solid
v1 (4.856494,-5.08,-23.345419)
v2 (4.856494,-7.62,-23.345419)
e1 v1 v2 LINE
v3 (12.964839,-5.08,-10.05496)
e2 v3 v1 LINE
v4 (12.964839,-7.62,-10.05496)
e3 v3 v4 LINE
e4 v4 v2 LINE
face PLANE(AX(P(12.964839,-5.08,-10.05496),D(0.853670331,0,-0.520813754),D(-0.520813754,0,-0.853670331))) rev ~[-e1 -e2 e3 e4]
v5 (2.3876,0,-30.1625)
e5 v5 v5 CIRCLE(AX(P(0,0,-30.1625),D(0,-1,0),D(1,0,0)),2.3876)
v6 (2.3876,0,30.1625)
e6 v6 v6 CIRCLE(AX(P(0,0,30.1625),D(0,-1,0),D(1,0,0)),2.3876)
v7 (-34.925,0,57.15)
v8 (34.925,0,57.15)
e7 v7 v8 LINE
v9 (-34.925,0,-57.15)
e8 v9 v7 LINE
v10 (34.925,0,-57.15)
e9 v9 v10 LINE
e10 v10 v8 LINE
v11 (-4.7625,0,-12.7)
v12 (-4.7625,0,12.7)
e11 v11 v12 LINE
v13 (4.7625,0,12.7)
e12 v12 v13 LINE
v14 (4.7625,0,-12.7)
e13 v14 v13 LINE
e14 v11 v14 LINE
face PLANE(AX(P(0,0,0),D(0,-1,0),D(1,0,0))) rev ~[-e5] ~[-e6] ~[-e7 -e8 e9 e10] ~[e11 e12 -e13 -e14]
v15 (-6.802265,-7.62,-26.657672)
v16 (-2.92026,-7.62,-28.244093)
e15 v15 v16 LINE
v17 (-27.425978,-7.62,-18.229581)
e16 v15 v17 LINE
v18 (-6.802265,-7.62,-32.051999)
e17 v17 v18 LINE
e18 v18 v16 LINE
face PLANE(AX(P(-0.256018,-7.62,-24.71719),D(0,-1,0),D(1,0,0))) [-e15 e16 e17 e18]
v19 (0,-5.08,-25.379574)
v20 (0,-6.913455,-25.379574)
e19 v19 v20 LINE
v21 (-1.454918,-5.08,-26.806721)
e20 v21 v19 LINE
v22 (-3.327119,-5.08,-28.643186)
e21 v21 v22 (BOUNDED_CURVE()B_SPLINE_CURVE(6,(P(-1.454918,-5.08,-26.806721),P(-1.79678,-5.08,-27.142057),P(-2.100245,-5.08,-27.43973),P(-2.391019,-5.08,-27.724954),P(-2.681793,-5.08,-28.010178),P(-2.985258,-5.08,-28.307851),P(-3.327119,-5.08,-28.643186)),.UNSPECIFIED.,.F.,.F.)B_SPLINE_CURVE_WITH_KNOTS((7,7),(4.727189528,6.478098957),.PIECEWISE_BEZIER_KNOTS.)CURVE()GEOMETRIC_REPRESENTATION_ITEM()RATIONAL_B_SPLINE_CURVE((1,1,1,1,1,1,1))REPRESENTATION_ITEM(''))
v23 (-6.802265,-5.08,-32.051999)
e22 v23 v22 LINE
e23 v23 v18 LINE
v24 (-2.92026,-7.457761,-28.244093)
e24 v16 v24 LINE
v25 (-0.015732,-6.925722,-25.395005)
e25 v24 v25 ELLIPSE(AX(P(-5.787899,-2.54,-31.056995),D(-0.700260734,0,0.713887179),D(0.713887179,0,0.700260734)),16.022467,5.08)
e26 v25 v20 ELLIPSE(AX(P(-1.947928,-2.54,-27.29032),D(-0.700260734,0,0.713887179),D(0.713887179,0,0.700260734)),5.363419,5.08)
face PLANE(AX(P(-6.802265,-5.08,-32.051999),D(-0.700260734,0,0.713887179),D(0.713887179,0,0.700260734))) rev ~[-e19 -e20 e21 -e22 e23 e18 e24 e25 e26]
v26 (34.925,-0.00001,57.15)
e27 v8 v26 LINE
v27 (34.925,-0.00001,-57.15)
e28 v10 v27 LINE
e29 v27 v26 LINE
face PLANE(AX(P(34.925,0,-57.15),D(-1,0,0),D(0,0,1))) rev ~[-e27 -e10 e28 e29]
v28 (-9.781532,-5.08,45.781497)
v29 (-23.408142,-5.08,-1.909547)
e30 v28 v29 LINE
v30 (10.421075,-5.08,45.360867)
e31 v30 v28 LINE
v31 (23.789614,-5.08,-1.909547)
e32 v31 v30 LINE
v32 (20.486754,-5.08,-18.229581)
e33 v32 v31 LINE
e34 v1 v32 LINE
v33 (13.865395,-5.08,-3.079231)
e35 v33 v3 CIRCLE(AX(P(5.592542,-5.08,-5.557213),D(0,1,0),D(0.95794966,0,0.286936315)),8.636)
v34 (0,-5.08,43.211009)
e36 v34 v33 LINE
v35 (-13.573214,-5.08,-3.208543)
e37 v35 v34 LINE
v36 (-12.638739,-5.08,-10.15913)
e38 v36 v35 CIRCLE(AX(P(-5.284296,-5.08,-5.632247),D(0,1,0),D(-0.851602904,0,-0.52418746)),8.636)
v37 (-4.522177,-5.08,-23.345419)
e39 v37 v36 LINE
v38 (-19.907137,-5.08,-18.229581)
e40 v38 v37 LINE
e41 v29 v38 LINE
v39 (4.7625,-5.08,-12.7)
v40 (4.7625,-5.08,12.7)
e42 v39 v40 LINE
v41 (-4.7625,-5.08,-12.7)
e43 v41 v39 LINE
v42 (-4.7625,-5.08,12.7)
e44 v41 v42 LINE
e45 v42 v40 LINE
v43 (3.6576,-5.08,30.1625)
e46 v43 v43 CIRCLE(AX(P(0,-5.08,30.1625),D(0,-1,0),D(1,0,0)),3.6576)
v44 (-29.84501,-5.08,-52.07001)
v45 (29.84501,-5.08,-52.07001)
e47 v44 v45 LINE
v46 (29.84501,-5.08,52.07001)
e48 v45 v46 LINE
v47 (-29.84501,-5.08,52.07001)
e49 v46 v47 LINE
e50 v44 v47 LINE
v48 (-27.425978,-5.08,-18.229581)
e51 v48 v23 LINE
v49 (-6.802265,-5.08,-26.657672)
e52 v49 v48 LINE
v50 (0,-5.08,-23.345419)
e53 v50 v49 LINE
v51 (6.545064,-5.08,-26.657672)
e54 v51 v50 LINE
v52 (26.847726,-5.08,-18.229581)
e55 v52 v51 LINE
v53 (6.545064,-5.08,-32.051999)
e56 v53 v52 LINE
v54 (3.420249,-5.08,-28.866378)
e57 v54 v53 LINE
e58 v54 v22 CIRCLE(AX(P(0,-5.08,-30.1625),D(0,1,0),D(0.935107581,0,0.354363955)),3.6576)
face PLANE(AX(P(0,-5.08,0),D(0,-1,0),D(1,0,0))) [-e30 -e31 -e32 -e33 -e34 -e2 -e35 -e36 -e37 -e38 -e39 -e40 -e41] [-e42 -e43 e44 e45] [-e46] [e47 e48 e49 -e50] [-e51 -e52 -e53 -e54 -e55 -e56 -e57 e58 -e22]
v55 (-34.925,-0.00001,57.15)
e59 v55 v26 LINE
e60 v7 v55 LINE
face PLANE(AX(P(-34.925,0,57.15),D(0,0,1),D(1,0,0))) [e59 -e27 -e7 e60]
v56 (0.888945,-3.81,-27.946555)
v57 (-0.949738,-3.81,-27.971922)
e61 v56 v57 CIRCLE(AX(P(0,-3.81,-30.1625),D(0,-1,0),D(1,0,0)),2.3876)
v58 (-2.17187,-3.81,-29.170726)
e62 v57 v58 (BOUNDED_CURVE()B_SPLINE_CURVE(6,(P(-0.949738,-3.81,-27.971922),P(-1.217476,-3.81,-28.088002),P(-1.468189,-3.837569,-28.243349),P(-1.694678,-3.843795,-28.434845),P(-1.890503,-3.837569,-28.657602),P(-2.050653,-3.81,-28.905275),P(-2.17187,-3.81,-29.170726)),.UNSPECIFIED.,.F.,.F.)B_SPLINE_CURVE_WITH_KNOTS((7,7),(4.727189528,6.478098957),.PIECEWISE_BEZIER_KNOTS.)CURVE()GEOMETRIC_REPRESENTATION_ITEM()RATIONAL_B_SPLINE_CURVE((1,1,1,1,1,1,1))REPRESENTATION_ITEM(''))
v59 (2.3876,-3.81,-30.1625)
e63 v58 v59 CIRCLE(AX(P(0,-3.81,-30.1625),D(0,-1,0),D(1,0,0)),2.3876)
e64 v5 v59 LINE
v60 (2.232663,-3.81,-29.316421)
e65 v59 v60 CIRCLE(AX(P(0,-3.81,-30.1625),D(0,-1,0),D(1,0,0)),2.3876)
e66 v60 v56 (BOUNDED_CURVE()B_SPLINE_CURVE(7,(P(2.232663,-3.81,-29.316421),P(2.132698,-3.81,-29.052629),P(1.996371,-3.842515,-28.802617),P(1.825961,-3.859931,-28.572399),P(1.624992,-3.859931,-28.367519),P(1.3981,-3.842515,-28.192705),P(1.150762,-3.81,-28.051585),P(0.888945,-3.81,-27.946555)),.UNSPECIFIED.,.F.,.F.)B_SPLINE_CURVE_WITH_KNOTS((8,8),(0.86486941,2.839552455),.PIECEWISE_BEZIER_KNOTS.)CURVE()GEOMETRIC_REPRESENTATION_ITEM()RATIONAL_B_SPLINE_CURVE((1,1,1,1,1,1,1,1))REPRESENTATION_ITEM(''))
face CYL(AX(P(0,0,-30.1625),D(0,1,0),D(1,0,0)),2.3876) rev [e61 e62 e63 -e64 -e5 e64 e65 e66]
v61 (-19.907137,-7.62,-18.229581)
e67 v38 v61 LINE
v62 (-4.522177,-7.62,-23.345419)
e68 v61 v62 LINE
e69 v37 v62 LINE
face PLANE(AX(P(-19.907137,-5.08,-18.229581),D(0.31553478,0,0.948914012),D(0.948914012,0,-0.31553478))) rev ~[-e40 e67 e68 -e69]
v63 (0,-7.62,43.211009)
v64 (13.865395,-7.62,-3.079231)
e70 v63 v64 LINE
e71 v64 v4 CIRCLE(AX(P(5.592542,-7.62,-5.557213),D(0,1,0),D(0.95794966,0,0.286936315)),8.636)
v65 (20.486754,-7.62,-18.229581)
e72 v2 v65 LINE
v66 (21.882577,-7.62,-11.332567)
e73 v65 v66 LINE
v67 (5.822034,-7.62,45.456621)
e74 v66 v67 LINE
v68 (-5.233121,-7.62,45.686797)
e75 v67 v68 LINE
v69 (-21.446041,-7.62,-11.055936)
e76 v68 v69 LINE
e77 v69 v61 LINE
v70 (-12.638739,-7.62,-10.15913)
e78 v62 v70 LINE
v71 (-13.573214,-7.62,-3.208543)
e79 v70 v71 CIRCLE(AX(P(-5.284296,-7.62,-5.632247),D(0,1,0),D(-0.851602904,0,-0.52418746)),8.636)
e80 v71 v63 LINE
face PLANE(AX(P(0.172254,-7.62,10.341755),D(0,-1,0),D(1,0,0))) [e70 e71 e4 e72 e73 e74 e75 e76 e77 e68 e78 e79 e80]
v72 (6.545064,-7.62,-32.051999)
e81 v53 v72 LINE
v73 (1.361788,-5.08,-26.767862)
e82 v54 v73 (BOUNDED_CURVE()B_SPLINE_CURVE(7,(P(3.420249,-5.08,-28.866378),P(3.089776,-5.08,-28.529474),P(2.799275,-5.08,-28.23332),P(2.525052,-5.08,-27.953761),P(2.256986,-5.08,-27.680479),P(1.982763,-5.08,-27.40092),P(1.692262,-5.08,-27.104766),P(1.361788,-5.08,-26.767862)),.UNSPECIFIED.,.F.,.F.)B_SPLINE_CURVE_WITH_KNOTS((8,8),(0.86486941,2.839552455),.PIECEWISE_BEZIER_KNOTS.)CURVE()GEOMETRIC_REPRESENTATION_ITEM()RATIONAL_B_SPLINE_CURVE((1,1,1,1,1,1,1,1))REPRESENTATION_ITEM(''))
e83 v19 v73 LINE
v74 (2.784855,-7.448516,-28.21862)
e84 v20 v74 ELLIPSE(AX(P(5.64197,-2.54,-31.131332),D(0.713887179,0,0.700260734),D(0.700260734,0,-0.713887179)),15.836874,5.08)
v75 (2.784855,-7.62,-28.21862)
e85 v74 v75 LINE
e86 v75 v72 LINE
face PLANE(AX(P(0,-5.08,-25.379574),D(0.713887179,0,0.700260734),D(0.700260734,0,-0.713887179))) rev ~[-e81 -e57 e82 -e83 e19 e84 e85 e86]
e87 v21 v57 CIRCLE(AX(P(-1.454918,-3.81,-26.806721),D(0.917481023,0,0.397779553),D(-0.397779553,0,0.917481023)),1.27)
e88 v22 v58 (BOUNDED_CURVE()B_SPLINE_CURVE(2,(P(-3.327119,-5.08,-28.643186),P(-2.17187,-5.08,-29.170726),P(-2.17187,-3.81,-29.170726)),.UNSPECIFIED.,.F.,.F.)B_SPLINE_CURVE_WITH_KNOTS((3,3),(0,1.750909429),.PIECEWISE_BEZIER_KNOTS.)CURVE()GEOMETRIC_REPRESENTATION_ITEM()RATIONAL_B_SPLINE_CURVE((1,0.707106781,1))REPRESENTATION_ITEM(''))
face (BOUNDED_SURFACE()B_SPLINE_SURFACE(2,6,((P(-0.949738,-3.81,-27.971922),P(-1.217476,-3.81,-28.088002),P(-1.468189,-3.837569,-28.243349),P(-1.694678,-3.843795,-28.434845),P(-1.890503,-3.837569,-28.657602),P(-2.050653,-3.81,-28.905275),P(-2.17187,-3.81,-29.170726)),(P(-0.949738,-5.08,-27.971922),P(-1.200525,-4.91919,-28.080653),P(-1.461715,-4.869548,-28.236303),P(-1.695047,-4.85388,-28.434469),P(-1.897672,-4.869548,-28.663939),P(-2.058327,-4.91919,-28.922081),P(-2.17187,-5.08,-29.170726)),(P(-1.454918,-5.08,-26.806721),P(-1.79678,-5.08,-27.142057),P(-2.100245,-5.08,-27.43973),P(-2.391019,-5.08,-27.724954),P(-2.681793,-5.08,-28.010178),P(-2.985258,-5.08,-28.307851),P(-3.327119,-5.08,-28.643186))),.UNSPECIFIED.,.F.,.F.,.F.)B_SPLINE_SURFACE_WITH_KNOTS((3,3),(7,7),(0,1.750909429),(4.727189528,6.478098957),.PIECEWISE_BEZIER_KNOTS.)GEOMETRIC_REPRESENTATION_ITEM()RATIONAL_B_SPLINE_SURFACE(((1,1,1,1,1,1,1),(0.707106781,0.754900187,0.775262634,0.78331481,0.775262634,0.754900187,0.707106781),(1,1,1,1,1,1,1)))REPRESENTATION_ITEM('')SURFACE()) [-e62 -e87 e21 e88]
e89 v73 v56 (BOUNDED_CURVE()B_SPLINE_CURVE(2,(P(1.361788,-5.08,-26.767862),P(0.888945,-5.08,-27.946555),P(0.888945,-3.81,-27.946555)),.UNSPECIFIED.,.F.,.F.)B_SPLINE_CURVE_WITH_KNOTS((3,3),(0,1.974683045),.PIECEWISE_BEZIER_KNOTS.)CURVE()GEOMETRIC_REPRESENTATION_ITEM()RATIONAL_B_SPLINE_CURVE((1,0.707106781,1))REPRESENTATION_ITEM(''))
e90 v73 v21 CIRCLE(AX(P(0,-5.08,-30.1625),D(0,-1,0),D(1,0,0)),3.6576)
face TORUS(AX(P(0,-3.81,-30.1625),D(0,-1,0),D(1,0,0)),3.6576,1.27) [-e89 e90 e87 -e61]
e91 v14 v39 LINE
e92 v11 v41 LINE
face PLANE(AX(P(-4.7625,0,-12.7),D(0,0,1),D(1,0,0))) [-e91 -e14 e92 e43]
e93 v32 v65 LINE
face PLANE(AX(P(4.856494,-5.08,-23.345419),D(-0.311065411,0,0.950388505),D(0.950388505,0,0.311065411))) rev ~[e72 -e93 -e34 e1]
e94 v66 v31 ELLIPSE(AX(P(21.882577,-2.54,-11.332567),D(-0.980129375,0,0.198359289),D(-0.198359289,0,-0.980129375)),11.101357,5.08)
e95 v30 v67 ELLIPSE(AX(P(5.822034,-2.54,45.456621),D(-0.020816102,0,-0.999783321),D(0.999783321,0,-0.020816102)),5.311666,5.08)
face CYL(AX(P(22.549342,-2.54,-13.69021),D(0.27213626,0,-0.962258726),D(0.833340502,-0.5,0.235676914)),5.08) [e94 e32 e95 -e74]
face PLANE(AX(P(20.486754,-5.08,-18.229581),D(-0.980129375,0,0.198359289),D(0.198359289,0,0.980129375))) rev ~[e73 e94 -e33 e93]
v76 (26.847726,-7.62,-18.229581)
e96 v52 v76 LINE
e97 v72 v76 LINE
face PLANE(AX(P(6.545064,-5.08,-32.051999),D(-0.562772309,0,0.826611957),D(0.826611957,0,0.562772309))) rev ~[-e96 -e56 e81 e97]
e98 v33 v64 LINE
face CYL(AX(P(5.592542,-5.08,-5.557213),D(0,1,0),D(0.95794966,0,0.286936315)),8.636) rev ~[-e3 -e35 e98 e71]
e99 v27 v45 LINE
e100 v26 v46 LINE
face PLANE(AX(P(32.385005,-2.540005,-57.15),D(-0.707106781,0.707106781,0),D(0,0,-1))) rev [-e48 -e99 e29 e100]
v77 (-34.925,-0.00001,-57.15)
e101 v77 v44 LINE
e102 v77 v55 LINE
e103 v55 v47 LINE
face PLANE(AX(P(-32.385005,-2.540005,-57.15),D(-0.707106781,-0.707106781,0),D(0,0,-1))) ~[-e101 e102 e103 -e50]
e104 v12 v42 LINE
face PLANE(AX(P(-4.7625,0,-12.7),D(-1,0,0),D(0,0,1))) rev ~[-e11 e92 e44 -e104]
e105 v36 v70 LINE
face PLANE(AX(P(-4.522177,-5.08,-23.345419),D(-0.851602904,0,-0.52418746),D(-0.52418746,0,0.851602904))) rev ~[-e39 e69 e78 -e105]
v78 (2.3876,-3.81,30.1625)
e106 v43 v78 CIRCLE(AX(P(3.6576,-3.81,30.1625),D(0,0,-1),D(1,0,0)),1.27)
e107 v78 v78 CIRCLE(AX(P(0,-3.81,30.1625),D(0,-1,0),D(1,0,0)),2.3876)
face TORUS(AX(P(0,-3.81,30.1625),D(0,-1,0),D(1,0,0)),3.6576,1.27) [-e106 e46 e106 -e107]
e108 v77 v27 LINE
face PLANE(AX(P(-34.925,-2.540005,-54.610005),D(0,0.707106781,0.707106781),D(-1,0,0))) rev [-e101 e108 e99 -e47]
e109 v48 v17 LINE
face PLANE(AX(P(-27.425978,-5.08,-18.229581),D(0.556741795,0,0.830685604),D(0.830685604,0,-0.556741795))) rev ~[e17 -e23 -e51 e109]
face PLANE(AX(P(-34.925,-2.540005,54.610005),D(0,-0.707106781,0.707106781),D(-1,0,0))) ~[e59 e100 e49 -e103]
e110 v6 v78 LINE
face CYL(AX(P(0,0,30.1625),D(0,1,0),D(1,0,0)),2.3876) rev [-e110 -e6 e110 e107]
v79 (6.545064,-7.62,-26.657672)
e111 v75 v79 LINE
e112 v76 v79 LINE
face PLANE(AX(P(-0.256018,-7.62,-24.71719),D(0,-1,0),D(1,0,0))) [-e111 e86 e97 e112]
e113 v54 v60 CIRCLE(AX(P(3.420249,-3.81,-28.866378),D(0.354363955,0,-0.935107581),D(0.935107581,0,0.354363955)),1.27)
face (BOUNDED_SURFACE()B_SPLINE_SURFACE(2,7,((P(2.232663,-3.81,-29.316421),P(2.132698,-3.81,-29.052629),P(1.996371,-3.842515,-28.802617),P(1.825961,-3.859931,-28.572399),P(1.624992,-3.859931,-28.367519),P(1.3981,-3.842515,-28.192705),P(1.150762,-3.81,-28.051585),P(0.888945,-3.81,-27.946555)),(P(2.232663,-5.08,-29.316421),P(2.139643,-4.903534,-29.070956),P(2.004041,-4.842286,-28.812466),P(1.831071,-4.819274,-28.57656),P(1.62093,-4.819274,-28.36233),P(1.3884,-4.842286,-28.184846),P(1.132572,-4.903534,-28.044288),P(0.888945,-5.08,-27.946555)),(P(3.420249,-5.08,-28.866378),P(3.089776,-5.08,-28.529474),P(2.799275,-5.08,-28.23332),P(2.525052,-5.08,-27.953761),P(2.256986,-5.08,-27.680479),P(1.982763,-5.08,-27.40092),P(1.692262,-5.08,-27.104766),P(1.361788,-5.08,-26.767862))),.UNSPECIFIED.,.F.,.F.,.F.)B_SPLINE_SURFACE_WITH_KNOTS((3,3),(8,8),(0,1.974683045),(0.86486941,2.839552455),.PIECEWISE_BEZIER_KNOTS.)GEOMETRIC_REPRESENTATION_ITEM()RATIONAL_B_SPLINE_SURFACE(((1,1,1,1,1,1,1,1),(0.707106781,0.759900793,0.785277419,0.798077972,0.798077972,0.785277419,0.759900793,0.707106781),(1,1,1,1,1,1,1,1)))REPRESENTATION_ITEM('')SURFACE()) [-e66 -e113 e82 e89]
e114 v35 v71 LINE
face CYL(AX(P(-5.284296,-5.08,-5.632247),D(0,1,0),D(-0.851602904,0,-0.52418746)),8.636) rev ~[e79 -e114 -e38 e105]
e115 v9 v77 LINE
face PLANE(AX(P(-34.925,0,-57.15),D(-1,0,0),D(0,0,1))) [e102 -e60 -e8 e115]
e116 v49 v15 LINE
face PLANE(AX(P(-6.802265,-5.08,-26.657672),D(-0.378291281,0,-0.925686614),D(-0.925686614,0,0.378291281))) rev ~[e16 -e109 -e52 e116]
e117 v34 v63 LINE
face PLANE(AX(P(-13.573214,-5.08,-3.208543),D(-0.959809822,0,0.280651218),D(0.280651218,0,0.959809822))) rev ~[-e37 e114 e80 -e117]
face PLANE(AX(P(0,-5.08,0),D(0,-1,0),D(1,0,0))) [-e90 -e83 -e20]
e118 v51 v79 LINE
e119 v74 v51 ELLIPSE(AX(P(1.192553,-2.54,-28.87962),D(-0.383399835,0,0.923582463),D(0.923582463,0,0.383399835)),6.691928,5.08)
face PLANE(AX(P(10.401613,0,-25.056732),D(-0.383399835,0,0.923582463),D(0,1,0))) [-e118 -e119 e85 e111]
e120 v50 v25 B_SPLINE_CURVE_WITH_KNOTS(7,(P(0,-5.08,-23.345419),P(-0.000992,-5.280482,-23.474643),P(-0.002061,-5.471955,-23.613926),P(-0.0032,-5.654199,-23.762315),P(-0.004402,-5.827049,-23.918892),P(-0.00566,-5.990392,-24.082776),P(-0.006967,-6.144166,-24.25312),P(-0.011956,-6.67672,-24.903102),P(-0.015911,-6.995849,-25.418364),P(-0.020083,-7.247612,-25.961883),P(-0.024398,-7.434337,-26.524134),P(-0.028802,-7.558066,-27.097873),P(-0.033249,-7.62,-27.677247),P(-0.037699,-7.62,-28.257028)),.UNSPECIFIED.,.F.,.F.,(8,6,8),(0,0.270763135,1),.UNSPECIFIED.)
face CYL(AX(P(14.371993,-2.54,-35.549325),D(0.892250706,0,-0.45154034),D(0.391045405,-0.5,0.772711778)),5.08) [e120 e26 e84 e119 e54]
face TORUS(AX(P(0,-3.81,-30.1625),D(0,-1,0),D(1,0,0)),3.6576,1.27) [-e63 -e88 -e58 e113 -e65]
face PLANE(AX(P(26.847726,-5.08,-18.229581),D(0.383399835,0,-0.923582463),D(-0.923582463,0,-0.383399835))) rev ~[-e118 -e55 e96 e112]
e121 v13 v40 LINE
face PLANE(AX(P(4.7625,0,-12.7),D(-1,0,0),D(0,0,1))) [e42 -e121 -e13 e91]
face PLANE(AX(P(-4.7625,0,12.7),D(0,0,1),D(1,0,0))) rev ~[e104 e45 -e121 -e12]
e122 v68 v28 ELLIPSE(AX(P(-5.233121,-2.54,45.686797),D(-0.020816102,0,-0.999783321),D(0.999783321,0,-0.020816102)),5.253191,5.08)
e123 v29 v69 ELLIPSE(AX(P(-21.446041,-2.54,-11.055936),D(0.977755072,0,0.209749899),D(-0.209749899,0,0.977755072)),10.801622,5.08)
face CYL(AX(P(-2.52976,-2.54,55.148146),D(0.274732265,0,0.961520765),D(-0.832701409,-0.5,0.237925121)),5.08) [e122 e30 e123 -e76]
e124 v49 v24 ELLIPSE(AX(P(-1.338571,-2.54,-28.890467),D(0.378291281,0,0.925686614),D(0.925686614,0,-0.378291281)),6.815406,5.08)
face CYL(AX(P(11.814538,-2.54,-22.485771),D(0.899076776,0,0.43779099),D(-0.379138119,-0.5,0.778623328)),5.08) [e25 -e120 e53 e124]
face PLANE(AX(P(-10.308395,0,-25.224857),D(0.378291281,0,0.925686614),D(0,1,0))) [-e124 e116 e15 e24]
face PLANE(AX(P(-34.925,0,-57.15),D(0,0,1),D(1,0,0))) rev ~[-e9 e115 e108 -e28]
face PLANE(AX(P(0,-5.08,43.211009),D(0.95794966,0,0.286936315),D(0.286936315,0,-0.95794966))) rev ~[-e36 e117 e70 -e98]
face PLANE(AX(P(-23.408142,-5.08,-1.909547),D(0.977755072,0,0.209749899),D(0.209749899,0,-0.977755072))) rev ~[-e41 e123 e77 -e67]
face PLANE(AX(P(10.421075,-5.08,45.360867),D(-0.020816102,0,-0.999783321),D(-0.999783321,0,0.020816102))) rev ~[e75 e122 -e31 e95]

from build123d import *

# Parameters (mm, degrees)
F0_W         = 69.85
F0_H         = 114.3
F0_R         = 2.3876
F0_W_2       = 9.525
F0_H_2       = 25.4
F1_DEPTH     = 5.08
F2_SIZE      = 5.07999
F4_DEPTH     = 2.54
F5_T1_DEPTH  = 71.5966436916
F5_T3_DEPTH  = 71.1214770669
F5_T8_DEPTH  = 29.3324993846
F5_T14_DEPTH = 29.5628780991
F6_R         = 1.27


# Not quite as in the source:
# - a fillet or chamfer that OpenCascade refuses, or shapes differently, is made with other operations: its cross-section is extruded or revolved along the edge and cut away or added
# - a fillet or chamfer is up to 0.001 mm smaller than in the source, because OpenCascade refuses the exact size


with BuildPart() as f1:
    # F0 (on Front) → F1 (new body)
    with BuildSketch(Plane.XZ):
        Rectangle(F0_W, F0_H)
        with Locations((0, -30.1625)):
            Circle(F0_R, mode=Mode.SUBTRACT)
        Rectangle(F0_W_2, F0_H_2, mode=Mode.SUBTRACT)
        with Locations((0, 30.1625)):
            Circle(F0_R, mode=Mode.SUBTRACT)
    extrude(amount=F1_DEPTH)

    # F2 (size 5.08 in the source; OpenCascade refuses exactly that, so slightly less here)
    f2_edges = [f1.edges().sort_by_distance(p)[0] for p in [
        (0, -5.08, 57.15),
        (34.925, -5.08, 0),
        (0, -5.08, -57.15),
        (-34.925, -5.08, 0),
    ]]
    chamfer(f2_edges, length=F2_SIZE)

    # F3 (on face) → F4 (join)
    with BuildSketch(Plane.XZ.offset(5.08)):
        with BuildLine():
            Line((10.4210752899, 45.360866621), (-9.7815324138, 45.7814973))
            Line((-9.7815324138, 45.7814973), (-23.4081424498, -1.9095465541))
            Line((-23.4081424498, -1.9095465541), (-19.9071371743, -18.2295814157))
            Line((-19.9071371743, -18.2295814157), (-4.5221770743, -23.345419034))
            Line((-4.5221770743, -23.345419034), (-12.6387388145, -10.1591296217))
            ThreePointArc((-12.6387388145, -10.1591296217), (-13.8432881685, -6.7829644544), (-13.5732137506, -3.2085427961))
            Line((-13.5732137506, -3.2085427961), (0, 43.2110093534))
            Line((0, 43.2110093534), (13.8653954743, -3.0792306258))
            ThreePointArc((13.8653954743, -3.0792306258), (14.1574638309, -6.6629312481), (12.9648391888, -10.0549602188))
            Line((12.9648391888, -10.0549602188), (4.856493974, -23.345419034))
            Line((4.856493974, -23.345419034), (20.4867540311, -18.2295814157))
            Line((20.4867540311, -18.2295814157), (23.789614439, -1.9095465541))
            Line((23.789614439, -1.9095465541), (10.4210752899, 45.360866621))
        make_face()
        Polygon((6.5450641223, -26.6576724823), (0, -23.345419034), (-6.802264601, -26.6576724823), (-27.4259783328, -18.2295814157), (-6.802264601, -32.0519991219), (0, -25.3795739263), (6.5450641223, -32.0519991219), (26.8477257341, -18.2295814157), align=None)
    extrude(amount=F4_DEPTH)

    # F5: fillet of radius 5.08 on 4 edges, made by hand

    # F5_s2 → F5_t1 (cut)
    with BuildSketch(Plane(origin=(14.3770362631, 0, 50.317420481), x_dir=(0, 1, 0), z_dir=(-0.2747322653, 0, -0.9615207655))):
        with BuildLine():
            ThreePointArc((-5.08, -21.9828009958), (-6.9394090512, -20.1233919446), (-7.62, -17.5833919446))
            Line((-7.62, -17.5833919446), (-7.62, -21.9828009958))
            Line((-7.62, -21.9828009958), (-5.08, -21.9828009958))
        make_face()
    extrude(amount=F5_T1_DEPTH, mode=Mode.SUBTRACT)

    # F5_s4 → F5_t3 (cut)
    with BuildSketch(Plane(origin=(5.2549558521, 0, -18.5812325171), x_dir=(0, 1, 0), z_dir=(-0.27213626, 0, 0.9622587261))):
        with BuildLine():
            ThreePointArc((-5.08, -22.3721072272), (-6.9394090512, -20.5126981759), (-7.62, -17.9726981759))
            Line((-7.62, -17.9726981759), (-7.62, -22.3721072272))
            Line((-7.62, -22.3721072272), (-5.08, -22.3721072272))
        make_face()
    extrude(amount=F5_T3_DEPTH, mode=Mode.SUBTRACT)


with BuildPart() as f5_tool6:
    # F5_s7 → F5_t8 (new body)
    with BuildSketch(Plane(origin=(25.7640738936, 0, -13.0383967217), x_dir=(0, 1, 0), z_dir=(-0.8922507056, 0, 0.4515403396))):
        with BuildLine():
            ThreePointArc((-5.08, 20.8299666066), (-6.9394090512, 22.6893756578), (-7.62, 25.2293756578))
            Line((-7.62, 25.2293756578), (-7.62, 20.8299666066))
            Line((-7.62, 20.8299666066), (-5.08, 20.8299666066))
        make_face()
    extrude(amount=F5_T8_DEPTH)

    split(bisect_by=Plane(origin=(10.401612722, 0, -25.0567324961), x_dir=(0, 1, 0), z_dir=(-0.3833998348, 0, 0.9235824634)), keep=Keep.TOP)

    split(bisect_by=Plane(origin=(9.1889369632, 0, -18.8710138282), x_dir=(0, 1, 0), z_dir=(0.4377909897, 0, -0.8990767761)), keep=Keep.TOP)


with BuildPart() as f1_1:
    add(f1.part)

    # F5_t5: cut F5_tool6
    add(f5_tool6.part, mode=Mode.SUBTRACT)


with BuildPart() as f5_tool12:
    # F5_s13 → F5_t14 (new body)
    with BuildSketch(Plane(origin=(0.6995793032, 0, 0.3406489008), x_dir=(0, 1, 0), z_dir=(-0.8990767761, 0, -0.4377909897))):
        with BuildLine():
            ThreePointArc((-5.08, 20.9893240819), (-6.9394090512, 22.8487331332), (-7.62, 25.3887331332))
            Line((-7.62, 25.3887331332), (-7.62, 20.9893240819))
            Line((-7.62, 20.9893240819), (-5.08, 20.9893240819))
        make_face()
    extrude(amount=F5_T14_DEPTH)

    split(bisect_by=Plane(origin=(-9.4055701954, 0, -18.5855524032), x_dir=(0, 1, 0), z_dir=(-0.4515403396, 0, -0.8922507056)), keep=Keep.TOP)

    split(bisect_by=Plane(origin=(-10.3083950149, 0, -25.2248565112), x_dir=(0, 1, 0), z_dir=(0.3782912807, 0, 0.9256866138)), keep=Keep.TOP)


with BuildPart() as f1_2:
    add(f1_1.part)

    # F5_t11: cut F5_tool12
    add(f5_tool12.part, mode=Mode.SUBTRACT)

    # F6
    f6_edges = [f1_2.edges().sort_by_distance(p)[0] for p in [
        (-2.3876, -5.08, 30.1625),
        (-2.3876, -5.08, -30.1625),
    ]]
    fillet(f6_edges, radius=F6_R)


solid = f1_2.part
